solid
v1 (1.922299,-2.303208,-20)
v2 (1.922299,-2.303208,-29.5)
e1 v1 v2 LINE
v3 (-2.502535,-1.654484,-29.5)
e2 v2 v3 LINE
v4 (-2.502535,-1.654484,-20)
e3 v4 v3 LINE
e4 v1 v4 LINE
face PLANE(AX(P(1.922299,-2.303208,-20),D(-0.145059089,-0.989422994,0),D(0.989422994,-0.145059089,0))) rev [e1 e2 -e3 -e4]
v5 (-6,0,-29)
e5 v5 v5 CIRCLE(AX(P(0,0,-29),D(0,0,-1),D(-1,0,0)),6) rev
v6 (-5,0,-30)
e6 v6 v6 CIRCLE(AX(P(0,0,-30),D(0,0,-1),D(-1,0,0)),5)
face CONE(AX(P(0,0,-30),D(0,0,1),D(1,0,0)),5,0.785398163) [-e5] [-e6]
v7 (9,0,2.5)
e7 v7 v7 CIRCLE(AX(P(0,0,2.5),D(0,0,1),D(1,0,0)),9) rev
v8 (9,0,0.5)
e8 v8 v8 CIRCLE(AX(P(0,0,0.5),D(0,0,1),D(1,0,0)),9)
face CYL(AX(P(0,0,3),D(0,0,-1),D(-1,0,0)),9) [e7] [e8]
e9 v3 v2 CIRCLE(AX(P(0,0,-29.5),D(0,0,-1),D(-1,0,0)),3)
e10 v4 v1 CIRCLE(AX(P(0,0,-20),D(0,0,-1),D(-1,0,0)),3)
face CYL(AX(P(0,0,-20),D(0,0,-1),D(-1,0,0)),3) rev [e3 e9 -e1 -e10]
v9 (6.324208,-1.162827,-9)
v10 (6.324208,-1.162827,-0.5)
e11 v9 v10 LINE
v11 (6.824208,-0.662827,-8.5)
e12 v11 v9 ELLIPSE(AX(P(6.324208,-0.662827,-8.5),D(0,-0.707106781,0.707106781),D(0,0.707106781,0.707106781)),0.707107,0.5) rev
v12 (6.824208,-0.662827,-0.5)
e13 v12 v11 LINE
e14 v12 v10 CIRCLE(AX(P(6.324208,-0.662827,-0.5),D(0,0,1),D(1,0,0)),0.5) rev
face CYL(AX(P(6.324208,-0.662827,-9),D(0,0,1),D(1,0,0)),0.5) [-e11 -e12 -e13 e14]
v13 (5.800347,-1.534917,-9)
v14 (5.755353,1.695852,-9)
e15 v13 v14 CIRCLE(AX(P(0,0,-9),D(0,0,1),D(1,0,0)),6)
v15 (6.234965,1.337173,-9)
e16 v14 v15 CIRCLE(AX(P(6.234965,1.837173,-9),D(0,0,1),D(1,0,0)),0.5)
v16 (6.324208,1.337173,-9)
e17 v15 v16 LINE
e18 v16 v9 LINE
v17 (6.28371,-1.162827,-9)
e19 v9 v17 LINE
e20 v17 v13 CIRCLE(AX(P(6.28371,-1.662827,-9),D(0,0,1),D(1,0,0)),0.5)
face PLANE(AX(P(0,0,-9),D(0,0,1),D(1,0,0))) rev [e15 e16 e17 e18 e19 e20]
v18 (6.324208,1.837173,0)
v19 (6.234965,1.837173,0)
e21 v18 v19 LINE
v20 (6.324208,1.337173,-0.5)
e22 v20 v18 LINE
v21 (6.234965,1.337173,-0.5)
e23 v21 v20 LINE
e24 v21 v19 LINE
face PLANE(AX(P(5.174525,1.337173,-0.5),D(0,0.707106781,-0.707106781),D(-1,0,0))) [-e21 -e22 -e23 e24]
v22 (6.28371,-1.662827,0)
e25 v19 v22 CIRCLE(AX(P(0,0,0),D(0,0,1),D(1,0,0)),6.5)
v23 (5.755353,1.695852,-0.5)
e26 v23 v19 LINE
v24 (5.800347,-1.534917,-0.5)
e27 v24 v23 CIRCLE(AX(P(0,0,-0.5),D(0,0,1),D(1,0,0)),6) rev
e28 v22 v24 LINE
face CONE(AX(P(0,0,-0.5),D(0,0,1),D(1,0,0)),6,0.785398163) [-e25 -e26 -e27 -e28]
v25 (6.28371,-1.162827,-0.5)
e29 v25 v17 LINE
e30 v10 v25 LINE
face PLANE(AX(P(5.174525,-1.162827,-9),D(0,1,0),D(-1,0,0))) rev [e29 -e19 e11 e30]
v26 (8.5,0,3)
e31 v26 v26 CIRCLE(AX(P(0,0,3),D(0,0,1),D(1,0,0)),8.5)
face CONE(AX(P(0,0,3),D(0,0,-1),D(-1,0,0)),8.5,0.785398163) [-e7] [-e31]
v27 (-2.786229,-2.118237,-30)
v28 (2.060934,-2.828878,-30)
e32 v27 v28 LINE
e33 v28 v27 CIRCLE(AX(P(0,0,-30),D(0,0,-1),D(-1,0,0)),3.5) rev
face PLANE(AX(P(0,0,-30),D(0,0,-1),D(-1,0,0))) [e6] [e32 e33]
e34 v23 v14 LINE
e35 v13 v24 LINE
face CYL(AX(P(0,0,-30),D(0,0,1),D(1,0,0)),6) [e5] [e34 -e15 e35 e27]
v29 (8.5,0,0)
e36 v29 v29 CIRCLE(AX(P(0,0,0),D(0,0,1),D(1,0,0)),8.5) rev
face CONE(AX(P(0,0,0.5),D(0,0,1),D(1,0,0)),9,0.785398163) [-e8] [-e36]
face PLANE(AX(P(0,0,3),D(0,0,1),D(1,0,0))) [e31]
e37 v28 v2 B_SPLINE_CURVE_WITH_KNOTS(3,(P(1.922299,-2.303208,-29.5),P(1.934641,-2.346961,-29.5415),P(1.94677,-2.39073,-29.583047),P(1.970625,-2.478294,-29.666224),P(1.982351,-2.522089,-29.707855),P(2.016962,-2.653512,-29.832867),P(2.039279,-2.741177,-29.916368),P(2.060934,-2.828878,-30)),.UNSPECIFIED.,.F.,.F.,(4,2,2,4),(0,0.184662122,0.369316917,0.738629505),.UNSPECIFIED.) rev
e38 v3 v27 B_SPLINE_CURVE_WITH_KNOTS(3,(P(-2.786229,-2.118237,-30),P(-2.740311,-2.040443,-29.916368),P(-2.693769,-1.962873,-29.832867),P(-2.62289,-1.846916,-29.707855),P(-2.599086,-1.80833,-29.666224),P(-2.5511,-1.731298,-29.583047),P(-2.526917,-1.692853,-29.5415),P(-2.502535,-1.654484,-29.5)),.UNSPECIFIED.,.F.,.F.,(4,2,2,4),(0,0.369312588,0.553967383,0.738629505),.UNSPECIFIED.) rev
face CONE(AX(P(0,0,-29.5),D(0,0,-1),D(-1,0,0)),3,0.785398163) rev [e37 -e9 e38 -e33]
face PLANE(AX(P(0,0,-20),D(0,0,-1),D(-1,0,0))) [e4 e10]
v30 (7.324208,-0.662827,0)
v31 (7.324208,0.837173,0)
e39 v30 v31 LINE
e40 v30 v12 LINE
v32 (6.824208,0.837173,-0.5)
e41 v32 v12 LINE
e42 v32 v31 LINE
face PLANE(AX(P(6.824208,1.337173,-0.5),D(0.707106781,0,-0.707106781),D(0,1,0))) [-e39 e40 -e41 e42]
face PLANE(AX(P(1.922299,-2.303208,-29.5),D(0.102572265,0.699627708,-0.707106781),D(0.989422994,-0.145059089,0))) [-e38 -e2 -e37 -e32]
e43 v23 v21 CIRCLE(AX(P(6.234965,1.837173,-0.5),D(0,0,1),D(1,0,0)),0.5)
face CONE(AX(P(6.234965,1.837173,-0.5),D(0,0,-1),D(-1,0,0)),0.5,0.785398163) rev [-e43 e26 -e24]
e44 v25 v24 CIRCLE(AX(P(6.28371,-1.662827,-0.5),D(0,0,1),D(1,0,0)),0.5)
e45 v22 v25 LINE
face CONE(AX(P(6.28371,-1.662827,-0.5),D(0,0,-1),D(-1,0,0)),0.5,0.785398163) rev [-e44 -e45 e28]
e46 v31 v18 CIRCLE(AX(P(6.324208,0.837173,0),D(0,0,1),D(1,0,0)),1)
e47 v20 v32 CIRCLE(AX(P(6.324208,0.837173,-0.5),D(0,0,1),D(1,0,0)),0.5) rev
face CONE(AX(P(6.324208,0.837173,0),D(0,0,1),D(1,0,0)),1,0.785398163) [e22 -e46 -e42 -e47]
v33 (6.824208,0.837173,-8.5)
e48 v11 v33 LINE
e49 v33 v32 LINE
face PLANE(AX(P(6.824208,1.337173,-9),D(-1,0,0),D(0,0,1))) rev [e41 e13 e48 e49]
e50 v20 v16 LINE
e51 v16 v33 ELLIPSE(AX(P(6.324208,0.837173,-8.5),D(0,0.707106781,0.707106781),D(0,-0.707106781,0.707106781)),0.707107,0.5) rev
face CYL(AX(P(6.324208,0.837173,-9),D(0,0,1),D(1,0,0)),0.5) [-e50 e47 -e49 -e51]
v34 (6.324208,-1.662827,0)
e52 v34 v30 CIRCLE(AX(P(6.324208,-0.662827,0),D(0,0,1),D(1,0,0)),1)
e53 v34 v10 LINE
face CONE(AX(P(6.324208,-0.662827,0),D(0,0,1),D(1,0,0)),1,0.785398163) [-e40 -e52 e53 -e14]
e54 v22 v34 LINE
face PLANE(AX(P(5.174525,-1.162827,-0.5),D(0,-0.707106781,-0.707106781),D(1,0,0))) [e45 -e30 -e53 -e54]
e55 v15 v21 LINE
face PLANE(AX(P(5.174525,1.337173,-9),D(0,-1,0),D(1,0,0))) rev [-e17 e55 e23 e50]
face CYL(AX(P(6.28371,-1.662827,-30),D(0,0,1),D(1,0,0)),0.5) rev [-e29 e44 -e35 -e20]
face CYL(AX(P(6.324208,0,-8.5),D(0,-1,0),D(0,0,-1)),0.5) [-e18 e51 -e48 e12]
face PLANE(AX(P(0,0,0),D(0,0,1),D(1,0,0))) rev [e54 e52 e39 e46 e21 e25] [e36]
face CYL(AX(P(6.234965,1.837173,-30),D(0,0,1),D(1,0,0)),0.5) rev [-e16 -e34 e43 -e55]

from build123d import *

# Parameters (mm, degrees)
SKETCH1_R           = 9
BOSS_EXTRUDE1_DEPTH = 3
SKETCH2_R           = 6
BOSS_EXTRUDE2_DEPTH = 30
SKETCH3_W           = 1.649682621
SKETCH3_H           = 2.5
BOSS_EXTRUDE3_DEPTH = 9
FILLET1_R           = 0.5
CHAMFER1_SIZE       = 0.5
CHAMFER2_SIZE       = 1
CUT_EXTRUDE1_DEPTH  = 10
CHAMFER3_SIZE       = 0.5


with BuildPart() as part:
    # Sketch1 → Boss-Extrude1 (new body)
    with BuildSketch(Plane.XY):
        Circle(SKETCH1_R)
    extrude(amount=BOSS_EXTRUDE1_DEPTH)

    # Sketch2 → Boss-Extrude2 (add)
    with BuildSketch(Plane(origin=(0, 0, 0), x_dir=(-1, 0, 0), z_dir=(0, 0, -1))):
        Circle(SKETCH2_R)
    extrude(amount=BOSS_EXTRUDE2_DEPTH)

    # Sketch3 → Boss-Extrude3 (add)
    with BuildSketch(Plane(origin=(0, 0, 0), x_dir=(-1, 0, 0), z_dir=(0, 0, -1))):
        with Locations((-5.999366701, 0.087173351)):
            Rectangle(SKETCH3_W, SKETCH3_H)
    extrude(amount=BOSS_EXTRUDE3_DEPTH)

    # Fillet1
    fillet1_edges = [part.edges().sort_by_distance(p)[0] for p in [
        (5.849099711, 1.337173351, -4.5),
        (5.886241091, -1.162826649, -4.5),
        (6.824208011, -1.162826649, -4.5),
        (6.824208011, 1.337173351, -4.5),
        (6.824208011, 0.087173351, -9),
    ]]
    fillet(fillet1_edges, radius=FILLET1_R)

    # Chamfer1
    chamfer1_edges = [part.edges().sort_by_distance(p)[0] for p in [
        (-9, 0, 0),
        (6.303958853, -1.162826649, 0),
        (-0.773923618, -5.949877497, 0),
        (6.824208011, 0.087173351, 0),
        (6.279586727, 1.337173351, 0),
        (5.935516377, 1.436760743, 0),
        (5.978713688, -1.266622868, 0),
        (6.677761402, -1.016380039, 0),
        (6.677761402, 1.190726742, 0),
        (-9, 0, 3),
    ]]
    chamfer(chamfer1_edges, length=CHAMFER1_SIZE - 0.0001)  # a hair under: the kernel refuses the full size

    # Chamfer2
    chamfer2_edges = [part.edges().sort_by_distance(p)[0] for p in [
        (6, 0, -30),
    ]]
    chamfer(chamfer2_edges, length=CHAMFER2_SIZE)

    # Sketch4 → Cut-Extrude1 (cut)
    with BuildSketch(Plane(origin=(0, 0, -30), x_dir=(-1, 0, 0), z_dir=(0, 0, -1))):
        with BuildLine():
            Line((-1.922298895, -2.303207971), (2.50253525, -1.654484005))
            ThreePointArc((2.50253525, -1.654484005), (-0.435177266, 2.968268982), (-1.922298895, -2.303207971))
        make_face()
    extrude(amount=-CUT_EXTRUDE1_DEPTH, mode=Mode.SUBTRACT)

    # Chamfer3
    chamfer3_edges = [part.edges().sort_by_distance(p)[0] for p in [
        (0.435177266, 2.968268982, -30),
        (-0.290118177, -1.978845988, -30),
    ]]
    chamfer(chamfer3_edges, length=CHAMFER3_SIZE)


solid = part.part
